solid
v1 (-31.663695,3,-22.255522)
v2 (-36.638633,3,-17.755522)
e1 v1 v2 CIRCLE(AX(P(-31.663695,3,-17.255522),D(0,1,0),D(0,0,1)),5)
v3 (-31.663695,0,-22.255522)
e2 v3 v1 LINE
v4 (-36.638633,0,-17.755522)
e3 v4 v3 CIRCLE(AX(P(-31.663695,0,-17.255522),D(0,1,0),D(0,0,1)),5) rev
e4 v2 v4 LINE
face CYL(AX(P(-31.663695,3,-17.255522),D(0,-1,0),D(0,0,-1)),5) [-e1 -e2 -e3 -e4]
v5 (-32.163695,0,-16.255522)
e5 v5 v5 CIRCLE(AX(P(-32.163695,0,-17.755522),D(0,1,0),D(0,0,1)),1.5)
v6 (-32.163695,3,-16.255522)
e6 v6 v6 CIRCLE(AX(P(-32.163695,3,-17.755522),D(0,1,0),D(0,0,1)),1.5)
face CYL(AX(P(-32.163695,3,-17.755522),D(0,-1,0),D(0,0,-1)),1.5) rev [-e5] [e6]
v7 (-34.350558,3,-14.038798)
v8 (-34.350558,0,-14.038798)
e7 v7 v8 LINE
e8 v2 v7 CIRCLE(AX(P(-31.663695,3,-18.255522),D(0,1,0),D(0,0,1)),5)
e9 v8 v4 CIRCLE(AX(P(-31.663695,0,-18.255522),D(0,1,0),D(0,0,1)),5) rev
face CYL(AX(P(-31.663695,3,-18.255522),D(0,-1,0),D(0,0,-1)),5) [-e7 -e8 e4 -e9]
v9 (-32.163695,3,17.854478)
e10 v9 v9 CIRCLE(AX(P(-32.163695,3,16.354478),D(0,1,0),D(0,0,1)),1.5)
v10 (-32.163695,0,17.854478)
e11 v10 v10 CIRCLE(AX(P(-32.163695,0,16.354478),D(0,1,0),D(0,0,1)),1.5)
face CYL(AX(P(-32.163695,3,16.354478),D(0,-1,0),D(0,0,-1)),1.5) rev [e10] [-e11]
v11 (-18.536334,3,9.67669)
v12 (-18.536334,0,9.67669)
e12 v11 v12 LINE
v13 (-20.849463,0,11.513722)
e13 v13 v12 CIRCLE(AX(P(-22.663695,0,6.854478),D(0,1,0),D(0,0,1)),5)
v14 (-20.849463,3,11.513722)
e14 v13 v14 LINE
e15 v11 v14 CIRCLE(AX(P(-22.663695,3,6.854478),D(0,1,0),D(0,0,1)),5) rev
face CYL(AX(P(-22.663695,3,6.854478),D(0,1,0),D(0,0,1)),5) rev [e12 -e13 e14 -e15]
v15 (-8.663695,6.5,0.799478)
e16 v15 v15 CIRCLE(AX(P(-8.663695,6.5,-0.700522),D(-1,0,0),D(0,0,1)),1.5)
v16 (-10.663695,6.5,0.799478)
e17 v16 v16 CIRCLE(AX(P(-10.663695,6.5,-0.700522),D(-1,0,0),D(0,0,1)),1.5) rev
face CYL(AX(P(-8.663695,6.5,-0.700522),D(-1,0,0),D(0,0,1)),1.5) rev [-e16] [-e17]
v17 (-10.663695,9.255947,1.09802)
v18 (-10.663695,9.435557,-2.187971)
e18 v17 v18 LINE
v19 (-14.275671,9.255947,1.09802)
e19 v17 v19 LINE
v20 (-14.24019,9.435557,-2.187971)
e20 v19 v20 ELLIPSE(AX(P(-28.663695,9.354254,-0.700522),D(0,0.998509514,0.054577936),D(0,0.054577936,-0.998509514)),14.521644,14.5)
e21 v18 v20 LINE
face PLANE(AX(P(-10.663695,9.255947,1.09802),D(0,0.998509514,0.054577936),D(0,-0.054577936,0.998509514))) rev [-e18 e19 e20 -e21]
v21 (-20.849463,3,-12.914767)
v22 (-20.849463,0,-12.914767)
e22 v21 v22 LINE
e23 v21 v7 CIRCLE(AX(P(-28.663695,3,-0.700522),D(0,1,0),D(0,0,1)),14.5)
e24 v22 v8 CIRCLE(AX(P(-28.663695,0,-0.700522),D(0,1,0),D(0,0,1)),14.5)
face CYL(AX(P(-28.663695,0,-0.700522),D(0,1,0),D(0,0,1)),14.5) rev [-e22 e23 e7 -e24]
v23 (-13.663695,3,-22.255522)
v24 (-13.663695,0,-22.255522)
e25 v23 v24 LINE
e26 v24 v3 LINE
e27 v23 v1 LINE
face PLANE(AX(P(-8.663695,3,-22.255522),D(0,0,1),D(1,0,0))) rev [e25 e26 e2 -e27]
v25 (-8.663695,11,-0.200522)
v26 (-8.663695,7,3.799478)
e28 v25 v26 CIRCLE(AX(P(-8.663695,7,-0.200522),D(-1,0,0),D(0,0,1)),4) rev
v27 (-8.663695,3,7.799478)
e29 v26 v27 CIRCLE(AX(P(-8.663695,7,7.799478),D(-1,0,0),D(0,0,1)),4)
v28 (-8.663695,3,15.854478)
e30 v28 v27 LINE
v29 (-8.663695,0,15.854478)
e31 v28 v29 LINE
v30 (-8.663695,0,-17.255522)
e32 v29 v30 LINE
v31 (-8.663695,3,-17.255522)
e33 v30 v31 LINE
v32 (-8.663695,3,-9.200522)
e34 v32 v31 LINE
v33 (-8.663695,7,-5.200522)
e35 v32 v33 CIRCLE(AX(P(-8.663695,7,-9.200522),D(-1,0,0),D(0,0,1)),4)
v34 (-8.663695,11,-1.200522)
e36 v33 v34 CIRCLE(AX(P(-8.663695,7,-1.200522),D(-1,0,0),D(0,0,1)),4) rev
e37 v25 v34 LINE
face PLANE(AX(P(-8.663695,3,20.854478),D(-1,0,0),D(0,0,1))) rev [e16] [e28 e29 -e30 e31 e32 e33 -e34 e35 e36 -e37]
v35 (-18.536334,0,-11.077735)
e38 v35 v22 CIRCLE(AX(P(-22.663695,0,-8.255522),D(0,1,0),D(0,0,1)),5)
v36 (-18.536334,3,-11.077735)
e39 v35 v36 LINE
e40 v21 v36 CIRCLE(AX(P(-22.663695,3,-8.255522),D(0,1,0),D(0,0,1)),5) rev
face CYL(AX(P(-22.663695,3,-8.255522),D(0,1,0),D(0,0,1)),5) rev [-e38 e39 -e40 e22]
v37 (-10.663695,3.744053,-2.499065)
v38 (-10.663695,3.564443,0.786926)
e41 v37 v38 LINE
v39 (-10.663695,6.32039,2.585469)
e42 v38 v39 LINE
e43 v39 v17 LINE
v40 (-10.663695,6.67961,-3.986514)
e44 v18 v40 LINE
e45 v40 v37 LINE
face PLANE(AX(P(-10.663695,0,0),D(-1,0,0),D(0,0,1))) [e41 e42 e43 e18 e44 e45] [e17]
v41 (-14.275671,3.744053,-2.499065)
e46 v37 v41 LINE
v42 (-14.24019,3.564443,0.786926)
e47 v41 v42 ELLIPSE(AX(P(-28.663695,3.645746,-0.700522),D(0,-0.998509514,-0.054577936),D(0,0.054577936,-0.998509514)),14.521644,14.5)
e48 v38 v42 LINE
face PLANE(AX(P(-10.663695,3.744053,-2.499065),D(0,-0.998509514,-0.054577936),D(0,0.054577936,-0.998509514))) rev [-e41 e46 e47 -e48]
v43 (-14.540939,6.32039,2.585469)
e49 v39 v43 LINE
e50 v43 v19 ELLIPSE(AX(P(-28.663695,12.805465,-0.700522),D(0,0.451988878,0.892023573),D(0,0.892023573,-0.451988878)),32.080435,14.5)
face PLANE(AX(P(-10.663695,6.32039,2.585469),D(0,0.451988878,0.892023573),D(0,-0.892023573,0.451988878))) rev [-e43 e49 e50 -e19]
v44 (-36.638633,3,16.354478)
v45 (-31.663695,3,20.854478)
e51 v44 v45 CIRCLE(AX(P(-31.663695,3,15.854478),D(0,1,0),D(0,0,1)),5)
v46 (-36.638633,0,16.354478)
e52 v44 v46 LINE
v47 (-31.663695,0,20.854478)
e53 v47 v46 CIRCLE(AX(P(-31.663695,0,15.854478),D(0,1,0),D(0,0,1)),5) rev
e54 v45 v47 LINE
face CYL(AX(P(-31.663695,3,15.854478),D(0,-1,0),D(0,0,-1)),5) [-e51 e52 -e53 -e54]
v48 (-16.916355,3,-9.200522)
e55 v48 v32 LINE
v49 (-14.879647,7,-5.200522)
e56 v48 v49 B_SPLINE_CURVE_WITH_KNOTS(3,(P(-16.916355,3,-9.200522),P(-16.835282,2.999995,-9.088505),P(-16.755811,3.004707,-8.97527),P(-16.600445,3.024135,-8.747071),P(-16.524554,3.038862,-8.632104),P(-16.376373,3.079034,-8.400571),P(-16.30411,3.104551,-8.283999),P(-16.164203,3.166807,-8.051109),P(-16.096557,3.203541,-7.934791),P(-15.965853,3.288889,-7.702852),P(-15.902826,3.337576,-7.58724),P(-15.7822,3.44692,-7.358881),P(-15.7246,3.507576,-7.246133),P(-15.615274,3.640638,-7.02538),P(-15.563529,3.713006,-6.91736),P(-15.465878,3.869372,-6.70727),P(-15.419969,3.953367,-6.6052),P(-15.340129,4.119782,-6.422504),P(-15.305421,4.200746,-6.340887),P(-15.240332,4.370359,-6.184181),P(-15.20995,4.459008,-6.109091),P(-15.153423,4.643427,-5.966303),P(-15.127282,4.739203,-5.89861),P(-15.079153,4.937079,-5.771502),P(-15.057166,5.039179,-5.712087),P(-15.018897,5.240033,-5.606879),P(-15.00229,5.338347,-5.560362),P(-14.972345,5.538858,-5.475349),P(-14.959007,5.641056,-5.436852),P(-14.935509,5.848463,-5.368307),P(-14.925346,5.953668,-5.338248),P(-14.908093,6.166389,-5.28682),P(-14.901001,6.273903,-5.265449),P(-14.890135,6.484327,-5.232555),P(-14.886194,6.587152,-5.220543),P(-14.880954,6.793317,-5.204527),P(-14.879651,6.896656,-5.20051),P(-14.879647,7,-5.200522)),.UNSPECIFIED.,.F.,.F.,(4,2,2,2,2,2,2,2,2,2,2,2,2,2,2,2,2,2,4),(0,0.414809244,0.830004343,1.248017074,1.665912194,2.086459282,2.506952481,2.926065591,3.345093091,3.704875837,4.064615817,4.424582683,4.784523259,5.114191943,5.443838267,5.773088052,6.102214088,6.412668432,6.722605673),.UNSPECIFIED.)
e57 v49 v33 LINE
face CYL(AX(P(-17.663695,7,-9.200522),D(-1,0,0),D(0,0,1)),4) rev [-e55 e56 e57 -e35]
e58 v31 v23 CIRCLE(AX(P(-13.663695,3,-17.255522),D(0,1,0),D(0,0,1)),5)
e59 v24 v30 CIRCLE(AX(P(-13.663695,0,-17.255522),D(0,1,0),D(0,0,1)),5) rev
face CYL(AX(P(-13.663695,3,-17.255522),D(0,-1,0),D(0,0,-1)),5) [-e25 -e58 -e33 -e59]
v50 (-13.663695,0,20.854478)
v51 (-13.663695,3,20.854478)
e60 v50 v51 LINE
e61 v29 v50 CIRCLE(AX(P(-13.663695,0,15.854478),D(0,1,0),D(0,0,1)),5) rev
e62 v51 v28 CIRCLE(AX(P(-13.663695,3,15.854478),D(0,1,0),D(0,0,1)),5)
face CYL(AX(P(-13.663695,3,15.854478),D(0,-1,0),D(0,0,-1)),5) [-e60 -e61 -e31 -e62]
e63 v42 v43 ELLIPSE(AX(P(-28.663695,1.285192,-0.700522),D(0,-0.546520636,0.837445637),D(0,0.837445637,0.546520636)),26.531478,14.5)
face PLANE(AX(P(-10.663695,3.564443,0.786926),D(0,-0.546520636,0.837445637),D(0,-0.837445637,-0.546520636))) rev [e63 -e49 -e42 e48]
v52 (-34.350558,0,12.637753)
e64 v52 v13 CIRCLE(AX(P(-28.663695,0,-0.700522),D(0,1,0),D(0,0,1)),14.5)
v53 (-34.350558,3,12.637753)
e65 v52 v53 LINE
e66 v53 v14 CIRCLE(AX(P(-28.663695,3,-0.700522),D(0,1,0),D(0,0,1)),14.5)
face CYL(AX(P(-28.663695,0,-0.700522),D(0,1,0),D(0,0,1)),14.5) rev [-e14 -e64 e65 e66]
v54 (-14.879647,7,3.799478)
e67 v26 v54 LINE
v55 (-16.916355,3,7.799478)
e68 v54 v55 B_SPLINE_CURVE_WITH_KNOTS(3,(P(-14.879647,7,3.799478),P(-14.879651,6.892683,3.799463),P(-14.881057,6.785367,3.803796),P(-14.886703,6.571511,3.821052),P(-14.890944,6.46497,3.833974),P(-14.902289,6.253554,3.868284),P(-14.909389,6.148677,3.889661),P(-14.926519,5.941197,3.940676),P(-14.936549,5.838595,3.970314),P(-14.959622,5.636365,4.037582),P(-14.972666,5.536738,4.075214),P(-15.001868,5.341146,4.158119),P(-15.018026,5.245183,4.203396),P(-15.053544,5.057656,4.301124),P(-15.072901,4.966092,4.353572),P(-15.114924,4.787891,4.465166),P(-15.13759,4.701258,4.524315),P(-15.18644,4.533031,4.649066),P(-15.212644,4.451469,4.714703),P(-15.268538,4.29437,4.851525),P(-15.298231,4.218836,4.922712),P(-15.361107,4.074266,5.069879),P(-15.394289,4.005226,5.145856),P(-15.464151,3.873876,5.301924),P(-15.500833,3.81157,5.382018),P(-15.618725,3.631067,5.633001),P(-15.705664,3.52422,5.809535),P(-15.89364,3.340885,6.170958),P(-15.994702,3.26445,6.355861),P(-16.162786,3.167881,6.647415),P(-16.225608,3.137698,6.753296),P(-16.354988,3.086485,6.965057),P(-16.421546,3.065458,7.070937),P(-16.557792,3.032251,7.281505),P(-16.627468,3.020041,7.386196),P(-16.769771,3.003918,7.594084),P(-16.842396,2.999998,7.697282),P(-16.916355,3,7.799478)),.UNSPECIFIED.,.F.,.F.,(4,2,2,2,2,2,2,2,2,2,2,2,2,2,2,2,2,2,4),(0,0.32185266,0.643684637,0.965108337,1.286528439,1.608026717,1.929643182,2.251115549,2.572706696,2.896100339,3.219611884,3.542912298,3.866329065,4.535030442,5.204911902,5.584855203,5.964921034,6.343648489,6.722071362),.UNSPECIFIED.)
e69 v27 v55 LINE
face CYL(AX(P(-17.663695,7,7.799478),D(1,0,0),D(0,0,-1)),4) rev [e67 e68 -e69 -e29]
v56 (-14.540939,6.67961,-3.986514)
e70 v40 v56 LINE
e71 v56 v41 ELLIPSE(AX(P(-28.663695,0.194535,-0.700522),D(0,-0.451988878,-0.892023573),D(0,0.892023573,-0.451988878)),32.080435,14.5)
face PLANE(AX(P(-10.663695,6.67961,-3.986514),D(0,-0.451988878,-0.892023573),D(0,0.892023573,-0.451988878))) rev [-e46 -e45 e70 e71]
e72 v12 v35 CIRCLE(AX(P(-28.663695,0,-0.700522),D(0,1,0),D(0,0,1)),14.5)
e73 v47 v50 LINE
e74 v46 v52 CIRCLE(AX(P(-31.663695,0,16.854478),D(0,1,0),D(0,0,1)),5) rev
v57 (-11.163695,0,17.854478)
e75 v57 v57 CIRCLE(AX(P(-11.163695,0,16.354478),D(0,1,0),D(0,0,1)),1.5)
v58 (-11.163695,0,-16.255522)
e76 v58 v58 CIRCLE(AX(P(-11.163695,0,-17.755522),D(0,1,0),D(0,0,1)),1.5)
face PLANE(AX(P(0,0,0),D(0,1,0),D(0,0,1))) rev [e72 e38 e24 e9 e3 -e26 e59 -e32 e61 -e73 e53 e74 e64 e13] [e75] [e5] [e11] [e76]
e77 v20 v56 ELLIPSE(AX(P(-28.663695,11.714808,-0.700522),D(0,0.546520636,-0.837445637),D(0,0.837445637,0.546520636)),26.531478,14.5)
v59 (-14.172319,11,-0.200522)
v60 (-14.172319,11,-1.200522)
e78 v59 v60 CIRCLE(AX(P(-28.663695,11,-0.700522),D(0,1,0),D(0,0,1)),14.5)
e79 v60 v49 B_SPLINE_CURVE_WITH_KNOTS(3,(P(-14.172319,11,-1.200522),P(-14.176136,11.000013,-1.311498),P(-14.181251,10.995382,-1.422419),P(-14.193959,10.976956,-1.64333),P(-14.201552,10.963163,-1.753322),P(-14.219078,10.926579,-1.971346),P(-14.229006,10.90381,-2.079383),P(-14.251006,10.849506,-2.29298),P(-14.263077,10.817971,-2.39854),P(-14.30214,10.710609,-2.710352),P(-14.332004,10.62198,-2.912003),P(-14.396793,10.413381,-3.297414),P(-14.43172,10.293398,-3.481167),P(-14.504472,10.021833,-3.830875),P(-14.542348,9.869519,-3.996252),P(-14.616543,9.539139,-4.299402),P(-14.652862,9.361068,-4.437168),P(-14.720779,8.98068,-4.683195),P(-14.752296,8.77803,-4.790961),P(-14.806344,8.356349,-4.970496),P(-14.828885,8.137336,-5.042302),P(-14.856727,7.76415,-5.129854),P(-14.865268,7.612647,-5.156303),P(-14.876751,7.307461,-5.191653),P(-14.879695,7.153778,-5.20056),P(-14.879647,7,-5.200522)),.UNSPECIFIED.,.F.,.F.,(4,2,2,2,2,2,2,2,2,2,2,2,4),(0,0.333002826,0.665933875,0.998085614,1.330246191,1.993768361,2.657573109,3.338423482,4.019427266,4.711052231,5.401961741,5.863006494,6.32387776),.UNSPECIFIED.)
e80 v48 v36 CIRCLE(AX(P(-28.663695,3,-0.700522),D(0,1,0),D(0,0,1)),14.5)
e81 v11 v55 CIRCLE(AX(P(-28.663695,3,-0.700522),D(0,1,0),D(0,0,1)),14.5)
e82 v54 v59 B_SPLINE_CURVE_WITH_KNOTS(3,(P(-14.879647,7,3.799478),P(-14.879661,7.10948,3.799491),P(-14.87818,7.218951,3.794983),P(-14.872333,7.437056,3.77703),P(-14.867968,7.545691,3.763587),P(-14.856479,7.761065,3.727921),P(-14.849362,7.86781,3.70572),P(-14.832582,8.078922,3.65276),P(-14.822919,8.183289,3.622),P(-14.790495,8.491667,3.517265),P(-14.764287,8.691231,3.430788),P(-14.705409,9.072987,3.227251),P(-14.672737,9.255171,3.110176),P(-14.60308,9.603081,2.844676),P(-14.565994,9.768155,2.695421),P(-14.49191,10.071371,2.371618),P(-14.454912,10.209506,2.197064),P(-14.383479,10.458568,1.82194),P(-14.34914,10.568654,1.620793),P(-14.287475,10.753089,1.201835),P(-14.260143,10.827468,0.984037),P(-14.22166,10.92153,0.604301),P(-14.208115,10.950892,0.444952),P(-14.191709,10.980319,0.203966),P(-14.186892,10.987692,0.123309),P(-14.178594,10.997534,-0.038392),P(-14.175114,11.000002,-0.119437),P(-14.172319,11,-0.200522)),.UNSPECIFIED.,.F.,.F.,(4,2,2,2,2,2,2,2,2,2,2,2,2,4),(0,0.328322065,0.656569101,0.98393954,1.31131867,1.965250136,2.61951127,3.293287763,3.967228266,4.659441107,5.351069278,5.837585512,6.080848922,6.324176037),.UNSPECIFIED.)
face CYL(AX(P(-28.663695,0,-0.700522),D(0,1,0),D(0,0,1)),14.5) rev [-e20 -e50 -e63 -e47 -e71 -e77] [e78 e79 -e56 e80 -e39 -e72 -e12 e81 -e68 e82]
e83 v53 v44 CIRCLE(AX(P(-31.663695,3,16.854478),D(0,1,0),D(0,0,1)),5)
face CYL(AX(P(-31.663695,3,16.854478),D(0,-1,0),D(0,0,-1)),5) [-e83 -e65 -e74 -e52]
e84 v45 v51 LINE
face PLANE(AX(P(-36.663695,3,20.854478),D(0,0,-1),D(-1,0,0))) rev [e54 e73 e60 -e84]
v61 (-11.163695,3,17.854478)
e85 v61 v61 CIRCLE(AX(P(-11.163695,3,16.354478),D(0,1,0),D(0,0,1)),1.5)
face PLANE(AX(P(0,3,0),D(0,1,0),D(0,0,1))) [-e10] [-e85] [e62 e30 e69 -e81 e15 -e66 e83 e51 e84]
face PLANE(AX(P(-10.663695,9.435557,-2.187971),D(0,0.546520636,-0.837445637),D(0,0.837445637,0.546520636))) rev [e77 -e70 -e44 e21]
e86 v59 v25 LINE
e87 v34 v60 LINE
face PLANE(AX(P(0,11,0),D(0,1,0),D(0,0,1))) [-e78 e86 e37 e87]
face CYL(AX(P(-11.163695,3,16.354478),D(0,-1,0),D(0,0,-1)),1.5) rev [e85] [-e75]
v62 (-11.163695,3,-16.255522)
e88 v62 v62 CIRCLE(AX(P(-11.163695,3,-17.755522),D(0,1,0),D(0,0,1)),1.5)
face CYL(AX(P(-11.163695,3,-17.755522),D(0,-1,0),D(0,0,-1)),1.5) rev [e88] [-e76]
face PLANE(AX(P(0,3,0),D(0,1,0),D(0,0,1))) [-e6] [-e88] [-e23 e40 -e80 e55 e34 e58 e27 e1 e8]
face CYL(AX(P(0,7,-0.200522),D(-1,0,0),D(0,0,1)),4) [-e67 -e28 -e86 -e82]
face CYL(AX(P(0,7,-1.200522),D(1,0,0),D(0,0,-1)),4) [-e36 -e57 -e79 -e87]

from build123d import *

# Parameters (mm, degrees)
ESQUISSE1_R                  = 1.5
BOSS_EXTRU_1_DEPTH           = 3
ESQUISSE2_W                  = 9
ESQUISSE2_H                  = 9
BOSS_EXTRU_2_DEPTH           = 8
ESQUISSE3_R                  = 1.5
ENL_V_MAT_EXTRU_1_DEPTH      = 32.261930151
ENL_V_MAT_EXTRU_2_DEPTH      = 7
CONG_1_R                     = 5
CONG_2_R                     = 4
CONG_3_R                     = 4
ENL_V_MAT_EXTRU_3_DEPTH      = 44.608458759
ENL_V_MAT_EXTRU_3_DEPTH_BACK = 44.608458759
ESQUISSE5_R                  = 14.5


# Some blends are built 0.0001 mm under size
with BuildPart() as part:
    # Esquisse1 → Boss.-Extru.1 (new body)
    with BuildSketch(Plane(origin=(0, 0, 0), x_dir=(1, 0, 0), z_dir=(0, 1, 0))):
        Polygon((-36.663695412, 22.255522388), (-36.663695412, 13.255522388), (-17.663695412, 13.255522388), (-17.663695412, -11.854477612), (-36.663695412, -11.854477612), (-36.663695412, -20.854477612), (-8.663695412, -20.854477612), (-8.663695412, 22.255522388), align=None)
        with Locations(Location((-32.163695412, 17.755522388, 0), (0, 0, 270))):
            Circle(ESQUISSE1_R, mode=Mode.SUBTRACT)
        with Locations(Location((-11.163695412, 17.755522388, 0), (0, 0, 270))):
            Circle(ESQUISSE1_R, mode=Mode.SUBTRACT)
        with Locations(Location((-32.163695412, -16.354477612, 0), (0, 0, 270))):
            Circle(ESQUISSE1_R, mode=Mode.SUBTRACT)
        with Locations(Location((-11.163695412, -16.354477612, 0), (0, 0, 270))):
            Circle(ESQUISSE1_R, mode=Mode.SUBTRACT)
    extrude(amount=BOSS_EXTRU_1_DEPTH)

    # Esquisse2 → Boss.-Extru.2 (add)
    with BuildSketch(Plane(origin=(0, 3, 0), x_dir=(1, 0, 0), z_dir=(0, 1, 0))):
        with Locations((-13.163695412, 0.700522388)):
            Rectangle(ESQUISSE2_W, ESQUISSE2_H)
    extrude(amount=BOSS_EXTRU_2_DEPTH)

    # Esquisse3 → Enlèv. mat.-Extru.1 (cut, through all)
    with BuildSketch(Plane.ZY.offset(17.663695412)):
        with Locations((-0.700522388, 6.5)):
            Circle(ESQUISSE3_R)
    extrude(amount=-ENL_V_MAT_EXTRU_1_DEPTH, mode=Mode.SUBTRACT)

    # Esquisse4 → Enlèv. mat.-Extru.2 (cut)
    with BuildSketch(Plane.ZY.offset(17.663695412)):
        Polygon((0.786926245, 3.564442716), (2.58546911, 6.320389661), (1.098020477, 9.255946944), (-2.187971021, 9.435557284), (-3.986513886, 6.679610339), (-2.499065254, 3.744053056), align=None)
    extrude(amount=-ENL_V_MAT_EXTRU_2_DEPTH, mode=Mode.SUBTRACT)

    # Congé1
    # the kernel refuses this fillet: 5 mm, written as the material it adds along each edge
    with BuildSketch(Plane(origin=(-17.663695412, 0, 11.854477612), x_dir=(0, 0, -1), z_dir=(0, 1, 0)), Plane(origin=(-17.663695412, 0, -13.255522388), x_dir=(-1, 0, 0), z_dir=(0, 1, 0))) as cong_1_piece_1:
        with BuildLine():
            CenterArc((CONG_1_R, CONG_1_R), CONG_1_R, 180, 90)
            Line((0, CONG_1_R), (0, 0))
            Line((0, 0), (CONG_1_R, 0))
        make_face()
    extrude(amount=3)
    # the kernel refuses this fillet: 5 mm, written as the material it takes off along each edge
    with BuildSketch(Plane(origin=(-8.663695412, -12.5, 20.854477612), x_dir=(0, 0, -1), z_dir=(0, 1, 0)), Plane(origin=(-8.663695412, -12.5, -22.255522388), x_dir=(-1, 0, 0), z_dir=(0, 1, 0)), Plane(origin=(-36.663695412, -12.5, -22.255522388), x_dir=(0, 0, 1), z_dir=(0, 1, 0))) as cong_1_2_piece_1:
        with BuildLine():
            CenterArc((CONG_1_R, CONG_1_R), CONG_1_R, 180, 90)
            Line((0, CONG_1_R), (0, 0))
            Line((0, 0), (CONG_1_R, 0))
        make_face()
    extrude(amount=28, mode=Mode.SUBTRACT)
    with BuildSketch(Plane(origin=(-36.663695412, -12.5, 20.854477612), x_dir=(0, 0, -1), z_dir=(0, 1, 0)), Plane(origin=(-36.663695412, -12.5, 11.854477612), x_dir=(1, 0, 0), z_dir=(0, 1, 0)), Plane(origin=(-36.663695412, -12.5, -13.255522388), x_dir=(0, 0, -1), z_dir=(0, 1, 0))) as cong_1_2_piece_2:
        with BuildLine():
            CenterArc((CONG_1_R, -CONG_1_R), CONG_1_R, 90, 90)
            Line((0, -CONG_1_R), (0, 0))
            Line((0, 0), (CONG_1_R, 0))
        make_face()
    extrude(amount=28, mode=Mode.SUBTRACT)

    # Congé2
    cong_2_edges = [part.edges().sort_by_distance(p)[0] for p in [
        (-13.163695412, 11, 3.799477612),
        (-13.163695412, 11, -5.200522388),
    ]]
    fillet(cong_2_edges, radius=CONG_2_R)

    # Congé3
    cong_3_edges = [part.edges().sort_by_distance(p)[0] for p in [
        (-13.163695412, 3, 3.799477612),
        (-13.163695412, 3, -5.200522388),
    ]]
    fillet(cong_3_edges, radius=CONG_3_R - 0.0001)  # a hair under: the kernel refuses the full size

    # Esquisse5 → Enlèv. mat.-Extru.3 (cut, two sides: drawn at the far end of the back side and taken through both)
    with BuildSketch(Plane(origin=(0, 3, 0), x_dir=(1, 0, 0), z_dir=(0, 1, 0)).offset(-ENL_V_MAT_EXTRU_3_DEPTH_BACK)):
        with Locations((-28.663695412, 0.700522388)):
            Circle(ESQUISSE5_R)
    extrude(amount=ENL_V_MAT_EXTRU_3_DEPTH + ENL_V_MAT_EXTRU_3_DEPTH_BACK, mode=Mode.SUBTRACT)


solid = part.part
